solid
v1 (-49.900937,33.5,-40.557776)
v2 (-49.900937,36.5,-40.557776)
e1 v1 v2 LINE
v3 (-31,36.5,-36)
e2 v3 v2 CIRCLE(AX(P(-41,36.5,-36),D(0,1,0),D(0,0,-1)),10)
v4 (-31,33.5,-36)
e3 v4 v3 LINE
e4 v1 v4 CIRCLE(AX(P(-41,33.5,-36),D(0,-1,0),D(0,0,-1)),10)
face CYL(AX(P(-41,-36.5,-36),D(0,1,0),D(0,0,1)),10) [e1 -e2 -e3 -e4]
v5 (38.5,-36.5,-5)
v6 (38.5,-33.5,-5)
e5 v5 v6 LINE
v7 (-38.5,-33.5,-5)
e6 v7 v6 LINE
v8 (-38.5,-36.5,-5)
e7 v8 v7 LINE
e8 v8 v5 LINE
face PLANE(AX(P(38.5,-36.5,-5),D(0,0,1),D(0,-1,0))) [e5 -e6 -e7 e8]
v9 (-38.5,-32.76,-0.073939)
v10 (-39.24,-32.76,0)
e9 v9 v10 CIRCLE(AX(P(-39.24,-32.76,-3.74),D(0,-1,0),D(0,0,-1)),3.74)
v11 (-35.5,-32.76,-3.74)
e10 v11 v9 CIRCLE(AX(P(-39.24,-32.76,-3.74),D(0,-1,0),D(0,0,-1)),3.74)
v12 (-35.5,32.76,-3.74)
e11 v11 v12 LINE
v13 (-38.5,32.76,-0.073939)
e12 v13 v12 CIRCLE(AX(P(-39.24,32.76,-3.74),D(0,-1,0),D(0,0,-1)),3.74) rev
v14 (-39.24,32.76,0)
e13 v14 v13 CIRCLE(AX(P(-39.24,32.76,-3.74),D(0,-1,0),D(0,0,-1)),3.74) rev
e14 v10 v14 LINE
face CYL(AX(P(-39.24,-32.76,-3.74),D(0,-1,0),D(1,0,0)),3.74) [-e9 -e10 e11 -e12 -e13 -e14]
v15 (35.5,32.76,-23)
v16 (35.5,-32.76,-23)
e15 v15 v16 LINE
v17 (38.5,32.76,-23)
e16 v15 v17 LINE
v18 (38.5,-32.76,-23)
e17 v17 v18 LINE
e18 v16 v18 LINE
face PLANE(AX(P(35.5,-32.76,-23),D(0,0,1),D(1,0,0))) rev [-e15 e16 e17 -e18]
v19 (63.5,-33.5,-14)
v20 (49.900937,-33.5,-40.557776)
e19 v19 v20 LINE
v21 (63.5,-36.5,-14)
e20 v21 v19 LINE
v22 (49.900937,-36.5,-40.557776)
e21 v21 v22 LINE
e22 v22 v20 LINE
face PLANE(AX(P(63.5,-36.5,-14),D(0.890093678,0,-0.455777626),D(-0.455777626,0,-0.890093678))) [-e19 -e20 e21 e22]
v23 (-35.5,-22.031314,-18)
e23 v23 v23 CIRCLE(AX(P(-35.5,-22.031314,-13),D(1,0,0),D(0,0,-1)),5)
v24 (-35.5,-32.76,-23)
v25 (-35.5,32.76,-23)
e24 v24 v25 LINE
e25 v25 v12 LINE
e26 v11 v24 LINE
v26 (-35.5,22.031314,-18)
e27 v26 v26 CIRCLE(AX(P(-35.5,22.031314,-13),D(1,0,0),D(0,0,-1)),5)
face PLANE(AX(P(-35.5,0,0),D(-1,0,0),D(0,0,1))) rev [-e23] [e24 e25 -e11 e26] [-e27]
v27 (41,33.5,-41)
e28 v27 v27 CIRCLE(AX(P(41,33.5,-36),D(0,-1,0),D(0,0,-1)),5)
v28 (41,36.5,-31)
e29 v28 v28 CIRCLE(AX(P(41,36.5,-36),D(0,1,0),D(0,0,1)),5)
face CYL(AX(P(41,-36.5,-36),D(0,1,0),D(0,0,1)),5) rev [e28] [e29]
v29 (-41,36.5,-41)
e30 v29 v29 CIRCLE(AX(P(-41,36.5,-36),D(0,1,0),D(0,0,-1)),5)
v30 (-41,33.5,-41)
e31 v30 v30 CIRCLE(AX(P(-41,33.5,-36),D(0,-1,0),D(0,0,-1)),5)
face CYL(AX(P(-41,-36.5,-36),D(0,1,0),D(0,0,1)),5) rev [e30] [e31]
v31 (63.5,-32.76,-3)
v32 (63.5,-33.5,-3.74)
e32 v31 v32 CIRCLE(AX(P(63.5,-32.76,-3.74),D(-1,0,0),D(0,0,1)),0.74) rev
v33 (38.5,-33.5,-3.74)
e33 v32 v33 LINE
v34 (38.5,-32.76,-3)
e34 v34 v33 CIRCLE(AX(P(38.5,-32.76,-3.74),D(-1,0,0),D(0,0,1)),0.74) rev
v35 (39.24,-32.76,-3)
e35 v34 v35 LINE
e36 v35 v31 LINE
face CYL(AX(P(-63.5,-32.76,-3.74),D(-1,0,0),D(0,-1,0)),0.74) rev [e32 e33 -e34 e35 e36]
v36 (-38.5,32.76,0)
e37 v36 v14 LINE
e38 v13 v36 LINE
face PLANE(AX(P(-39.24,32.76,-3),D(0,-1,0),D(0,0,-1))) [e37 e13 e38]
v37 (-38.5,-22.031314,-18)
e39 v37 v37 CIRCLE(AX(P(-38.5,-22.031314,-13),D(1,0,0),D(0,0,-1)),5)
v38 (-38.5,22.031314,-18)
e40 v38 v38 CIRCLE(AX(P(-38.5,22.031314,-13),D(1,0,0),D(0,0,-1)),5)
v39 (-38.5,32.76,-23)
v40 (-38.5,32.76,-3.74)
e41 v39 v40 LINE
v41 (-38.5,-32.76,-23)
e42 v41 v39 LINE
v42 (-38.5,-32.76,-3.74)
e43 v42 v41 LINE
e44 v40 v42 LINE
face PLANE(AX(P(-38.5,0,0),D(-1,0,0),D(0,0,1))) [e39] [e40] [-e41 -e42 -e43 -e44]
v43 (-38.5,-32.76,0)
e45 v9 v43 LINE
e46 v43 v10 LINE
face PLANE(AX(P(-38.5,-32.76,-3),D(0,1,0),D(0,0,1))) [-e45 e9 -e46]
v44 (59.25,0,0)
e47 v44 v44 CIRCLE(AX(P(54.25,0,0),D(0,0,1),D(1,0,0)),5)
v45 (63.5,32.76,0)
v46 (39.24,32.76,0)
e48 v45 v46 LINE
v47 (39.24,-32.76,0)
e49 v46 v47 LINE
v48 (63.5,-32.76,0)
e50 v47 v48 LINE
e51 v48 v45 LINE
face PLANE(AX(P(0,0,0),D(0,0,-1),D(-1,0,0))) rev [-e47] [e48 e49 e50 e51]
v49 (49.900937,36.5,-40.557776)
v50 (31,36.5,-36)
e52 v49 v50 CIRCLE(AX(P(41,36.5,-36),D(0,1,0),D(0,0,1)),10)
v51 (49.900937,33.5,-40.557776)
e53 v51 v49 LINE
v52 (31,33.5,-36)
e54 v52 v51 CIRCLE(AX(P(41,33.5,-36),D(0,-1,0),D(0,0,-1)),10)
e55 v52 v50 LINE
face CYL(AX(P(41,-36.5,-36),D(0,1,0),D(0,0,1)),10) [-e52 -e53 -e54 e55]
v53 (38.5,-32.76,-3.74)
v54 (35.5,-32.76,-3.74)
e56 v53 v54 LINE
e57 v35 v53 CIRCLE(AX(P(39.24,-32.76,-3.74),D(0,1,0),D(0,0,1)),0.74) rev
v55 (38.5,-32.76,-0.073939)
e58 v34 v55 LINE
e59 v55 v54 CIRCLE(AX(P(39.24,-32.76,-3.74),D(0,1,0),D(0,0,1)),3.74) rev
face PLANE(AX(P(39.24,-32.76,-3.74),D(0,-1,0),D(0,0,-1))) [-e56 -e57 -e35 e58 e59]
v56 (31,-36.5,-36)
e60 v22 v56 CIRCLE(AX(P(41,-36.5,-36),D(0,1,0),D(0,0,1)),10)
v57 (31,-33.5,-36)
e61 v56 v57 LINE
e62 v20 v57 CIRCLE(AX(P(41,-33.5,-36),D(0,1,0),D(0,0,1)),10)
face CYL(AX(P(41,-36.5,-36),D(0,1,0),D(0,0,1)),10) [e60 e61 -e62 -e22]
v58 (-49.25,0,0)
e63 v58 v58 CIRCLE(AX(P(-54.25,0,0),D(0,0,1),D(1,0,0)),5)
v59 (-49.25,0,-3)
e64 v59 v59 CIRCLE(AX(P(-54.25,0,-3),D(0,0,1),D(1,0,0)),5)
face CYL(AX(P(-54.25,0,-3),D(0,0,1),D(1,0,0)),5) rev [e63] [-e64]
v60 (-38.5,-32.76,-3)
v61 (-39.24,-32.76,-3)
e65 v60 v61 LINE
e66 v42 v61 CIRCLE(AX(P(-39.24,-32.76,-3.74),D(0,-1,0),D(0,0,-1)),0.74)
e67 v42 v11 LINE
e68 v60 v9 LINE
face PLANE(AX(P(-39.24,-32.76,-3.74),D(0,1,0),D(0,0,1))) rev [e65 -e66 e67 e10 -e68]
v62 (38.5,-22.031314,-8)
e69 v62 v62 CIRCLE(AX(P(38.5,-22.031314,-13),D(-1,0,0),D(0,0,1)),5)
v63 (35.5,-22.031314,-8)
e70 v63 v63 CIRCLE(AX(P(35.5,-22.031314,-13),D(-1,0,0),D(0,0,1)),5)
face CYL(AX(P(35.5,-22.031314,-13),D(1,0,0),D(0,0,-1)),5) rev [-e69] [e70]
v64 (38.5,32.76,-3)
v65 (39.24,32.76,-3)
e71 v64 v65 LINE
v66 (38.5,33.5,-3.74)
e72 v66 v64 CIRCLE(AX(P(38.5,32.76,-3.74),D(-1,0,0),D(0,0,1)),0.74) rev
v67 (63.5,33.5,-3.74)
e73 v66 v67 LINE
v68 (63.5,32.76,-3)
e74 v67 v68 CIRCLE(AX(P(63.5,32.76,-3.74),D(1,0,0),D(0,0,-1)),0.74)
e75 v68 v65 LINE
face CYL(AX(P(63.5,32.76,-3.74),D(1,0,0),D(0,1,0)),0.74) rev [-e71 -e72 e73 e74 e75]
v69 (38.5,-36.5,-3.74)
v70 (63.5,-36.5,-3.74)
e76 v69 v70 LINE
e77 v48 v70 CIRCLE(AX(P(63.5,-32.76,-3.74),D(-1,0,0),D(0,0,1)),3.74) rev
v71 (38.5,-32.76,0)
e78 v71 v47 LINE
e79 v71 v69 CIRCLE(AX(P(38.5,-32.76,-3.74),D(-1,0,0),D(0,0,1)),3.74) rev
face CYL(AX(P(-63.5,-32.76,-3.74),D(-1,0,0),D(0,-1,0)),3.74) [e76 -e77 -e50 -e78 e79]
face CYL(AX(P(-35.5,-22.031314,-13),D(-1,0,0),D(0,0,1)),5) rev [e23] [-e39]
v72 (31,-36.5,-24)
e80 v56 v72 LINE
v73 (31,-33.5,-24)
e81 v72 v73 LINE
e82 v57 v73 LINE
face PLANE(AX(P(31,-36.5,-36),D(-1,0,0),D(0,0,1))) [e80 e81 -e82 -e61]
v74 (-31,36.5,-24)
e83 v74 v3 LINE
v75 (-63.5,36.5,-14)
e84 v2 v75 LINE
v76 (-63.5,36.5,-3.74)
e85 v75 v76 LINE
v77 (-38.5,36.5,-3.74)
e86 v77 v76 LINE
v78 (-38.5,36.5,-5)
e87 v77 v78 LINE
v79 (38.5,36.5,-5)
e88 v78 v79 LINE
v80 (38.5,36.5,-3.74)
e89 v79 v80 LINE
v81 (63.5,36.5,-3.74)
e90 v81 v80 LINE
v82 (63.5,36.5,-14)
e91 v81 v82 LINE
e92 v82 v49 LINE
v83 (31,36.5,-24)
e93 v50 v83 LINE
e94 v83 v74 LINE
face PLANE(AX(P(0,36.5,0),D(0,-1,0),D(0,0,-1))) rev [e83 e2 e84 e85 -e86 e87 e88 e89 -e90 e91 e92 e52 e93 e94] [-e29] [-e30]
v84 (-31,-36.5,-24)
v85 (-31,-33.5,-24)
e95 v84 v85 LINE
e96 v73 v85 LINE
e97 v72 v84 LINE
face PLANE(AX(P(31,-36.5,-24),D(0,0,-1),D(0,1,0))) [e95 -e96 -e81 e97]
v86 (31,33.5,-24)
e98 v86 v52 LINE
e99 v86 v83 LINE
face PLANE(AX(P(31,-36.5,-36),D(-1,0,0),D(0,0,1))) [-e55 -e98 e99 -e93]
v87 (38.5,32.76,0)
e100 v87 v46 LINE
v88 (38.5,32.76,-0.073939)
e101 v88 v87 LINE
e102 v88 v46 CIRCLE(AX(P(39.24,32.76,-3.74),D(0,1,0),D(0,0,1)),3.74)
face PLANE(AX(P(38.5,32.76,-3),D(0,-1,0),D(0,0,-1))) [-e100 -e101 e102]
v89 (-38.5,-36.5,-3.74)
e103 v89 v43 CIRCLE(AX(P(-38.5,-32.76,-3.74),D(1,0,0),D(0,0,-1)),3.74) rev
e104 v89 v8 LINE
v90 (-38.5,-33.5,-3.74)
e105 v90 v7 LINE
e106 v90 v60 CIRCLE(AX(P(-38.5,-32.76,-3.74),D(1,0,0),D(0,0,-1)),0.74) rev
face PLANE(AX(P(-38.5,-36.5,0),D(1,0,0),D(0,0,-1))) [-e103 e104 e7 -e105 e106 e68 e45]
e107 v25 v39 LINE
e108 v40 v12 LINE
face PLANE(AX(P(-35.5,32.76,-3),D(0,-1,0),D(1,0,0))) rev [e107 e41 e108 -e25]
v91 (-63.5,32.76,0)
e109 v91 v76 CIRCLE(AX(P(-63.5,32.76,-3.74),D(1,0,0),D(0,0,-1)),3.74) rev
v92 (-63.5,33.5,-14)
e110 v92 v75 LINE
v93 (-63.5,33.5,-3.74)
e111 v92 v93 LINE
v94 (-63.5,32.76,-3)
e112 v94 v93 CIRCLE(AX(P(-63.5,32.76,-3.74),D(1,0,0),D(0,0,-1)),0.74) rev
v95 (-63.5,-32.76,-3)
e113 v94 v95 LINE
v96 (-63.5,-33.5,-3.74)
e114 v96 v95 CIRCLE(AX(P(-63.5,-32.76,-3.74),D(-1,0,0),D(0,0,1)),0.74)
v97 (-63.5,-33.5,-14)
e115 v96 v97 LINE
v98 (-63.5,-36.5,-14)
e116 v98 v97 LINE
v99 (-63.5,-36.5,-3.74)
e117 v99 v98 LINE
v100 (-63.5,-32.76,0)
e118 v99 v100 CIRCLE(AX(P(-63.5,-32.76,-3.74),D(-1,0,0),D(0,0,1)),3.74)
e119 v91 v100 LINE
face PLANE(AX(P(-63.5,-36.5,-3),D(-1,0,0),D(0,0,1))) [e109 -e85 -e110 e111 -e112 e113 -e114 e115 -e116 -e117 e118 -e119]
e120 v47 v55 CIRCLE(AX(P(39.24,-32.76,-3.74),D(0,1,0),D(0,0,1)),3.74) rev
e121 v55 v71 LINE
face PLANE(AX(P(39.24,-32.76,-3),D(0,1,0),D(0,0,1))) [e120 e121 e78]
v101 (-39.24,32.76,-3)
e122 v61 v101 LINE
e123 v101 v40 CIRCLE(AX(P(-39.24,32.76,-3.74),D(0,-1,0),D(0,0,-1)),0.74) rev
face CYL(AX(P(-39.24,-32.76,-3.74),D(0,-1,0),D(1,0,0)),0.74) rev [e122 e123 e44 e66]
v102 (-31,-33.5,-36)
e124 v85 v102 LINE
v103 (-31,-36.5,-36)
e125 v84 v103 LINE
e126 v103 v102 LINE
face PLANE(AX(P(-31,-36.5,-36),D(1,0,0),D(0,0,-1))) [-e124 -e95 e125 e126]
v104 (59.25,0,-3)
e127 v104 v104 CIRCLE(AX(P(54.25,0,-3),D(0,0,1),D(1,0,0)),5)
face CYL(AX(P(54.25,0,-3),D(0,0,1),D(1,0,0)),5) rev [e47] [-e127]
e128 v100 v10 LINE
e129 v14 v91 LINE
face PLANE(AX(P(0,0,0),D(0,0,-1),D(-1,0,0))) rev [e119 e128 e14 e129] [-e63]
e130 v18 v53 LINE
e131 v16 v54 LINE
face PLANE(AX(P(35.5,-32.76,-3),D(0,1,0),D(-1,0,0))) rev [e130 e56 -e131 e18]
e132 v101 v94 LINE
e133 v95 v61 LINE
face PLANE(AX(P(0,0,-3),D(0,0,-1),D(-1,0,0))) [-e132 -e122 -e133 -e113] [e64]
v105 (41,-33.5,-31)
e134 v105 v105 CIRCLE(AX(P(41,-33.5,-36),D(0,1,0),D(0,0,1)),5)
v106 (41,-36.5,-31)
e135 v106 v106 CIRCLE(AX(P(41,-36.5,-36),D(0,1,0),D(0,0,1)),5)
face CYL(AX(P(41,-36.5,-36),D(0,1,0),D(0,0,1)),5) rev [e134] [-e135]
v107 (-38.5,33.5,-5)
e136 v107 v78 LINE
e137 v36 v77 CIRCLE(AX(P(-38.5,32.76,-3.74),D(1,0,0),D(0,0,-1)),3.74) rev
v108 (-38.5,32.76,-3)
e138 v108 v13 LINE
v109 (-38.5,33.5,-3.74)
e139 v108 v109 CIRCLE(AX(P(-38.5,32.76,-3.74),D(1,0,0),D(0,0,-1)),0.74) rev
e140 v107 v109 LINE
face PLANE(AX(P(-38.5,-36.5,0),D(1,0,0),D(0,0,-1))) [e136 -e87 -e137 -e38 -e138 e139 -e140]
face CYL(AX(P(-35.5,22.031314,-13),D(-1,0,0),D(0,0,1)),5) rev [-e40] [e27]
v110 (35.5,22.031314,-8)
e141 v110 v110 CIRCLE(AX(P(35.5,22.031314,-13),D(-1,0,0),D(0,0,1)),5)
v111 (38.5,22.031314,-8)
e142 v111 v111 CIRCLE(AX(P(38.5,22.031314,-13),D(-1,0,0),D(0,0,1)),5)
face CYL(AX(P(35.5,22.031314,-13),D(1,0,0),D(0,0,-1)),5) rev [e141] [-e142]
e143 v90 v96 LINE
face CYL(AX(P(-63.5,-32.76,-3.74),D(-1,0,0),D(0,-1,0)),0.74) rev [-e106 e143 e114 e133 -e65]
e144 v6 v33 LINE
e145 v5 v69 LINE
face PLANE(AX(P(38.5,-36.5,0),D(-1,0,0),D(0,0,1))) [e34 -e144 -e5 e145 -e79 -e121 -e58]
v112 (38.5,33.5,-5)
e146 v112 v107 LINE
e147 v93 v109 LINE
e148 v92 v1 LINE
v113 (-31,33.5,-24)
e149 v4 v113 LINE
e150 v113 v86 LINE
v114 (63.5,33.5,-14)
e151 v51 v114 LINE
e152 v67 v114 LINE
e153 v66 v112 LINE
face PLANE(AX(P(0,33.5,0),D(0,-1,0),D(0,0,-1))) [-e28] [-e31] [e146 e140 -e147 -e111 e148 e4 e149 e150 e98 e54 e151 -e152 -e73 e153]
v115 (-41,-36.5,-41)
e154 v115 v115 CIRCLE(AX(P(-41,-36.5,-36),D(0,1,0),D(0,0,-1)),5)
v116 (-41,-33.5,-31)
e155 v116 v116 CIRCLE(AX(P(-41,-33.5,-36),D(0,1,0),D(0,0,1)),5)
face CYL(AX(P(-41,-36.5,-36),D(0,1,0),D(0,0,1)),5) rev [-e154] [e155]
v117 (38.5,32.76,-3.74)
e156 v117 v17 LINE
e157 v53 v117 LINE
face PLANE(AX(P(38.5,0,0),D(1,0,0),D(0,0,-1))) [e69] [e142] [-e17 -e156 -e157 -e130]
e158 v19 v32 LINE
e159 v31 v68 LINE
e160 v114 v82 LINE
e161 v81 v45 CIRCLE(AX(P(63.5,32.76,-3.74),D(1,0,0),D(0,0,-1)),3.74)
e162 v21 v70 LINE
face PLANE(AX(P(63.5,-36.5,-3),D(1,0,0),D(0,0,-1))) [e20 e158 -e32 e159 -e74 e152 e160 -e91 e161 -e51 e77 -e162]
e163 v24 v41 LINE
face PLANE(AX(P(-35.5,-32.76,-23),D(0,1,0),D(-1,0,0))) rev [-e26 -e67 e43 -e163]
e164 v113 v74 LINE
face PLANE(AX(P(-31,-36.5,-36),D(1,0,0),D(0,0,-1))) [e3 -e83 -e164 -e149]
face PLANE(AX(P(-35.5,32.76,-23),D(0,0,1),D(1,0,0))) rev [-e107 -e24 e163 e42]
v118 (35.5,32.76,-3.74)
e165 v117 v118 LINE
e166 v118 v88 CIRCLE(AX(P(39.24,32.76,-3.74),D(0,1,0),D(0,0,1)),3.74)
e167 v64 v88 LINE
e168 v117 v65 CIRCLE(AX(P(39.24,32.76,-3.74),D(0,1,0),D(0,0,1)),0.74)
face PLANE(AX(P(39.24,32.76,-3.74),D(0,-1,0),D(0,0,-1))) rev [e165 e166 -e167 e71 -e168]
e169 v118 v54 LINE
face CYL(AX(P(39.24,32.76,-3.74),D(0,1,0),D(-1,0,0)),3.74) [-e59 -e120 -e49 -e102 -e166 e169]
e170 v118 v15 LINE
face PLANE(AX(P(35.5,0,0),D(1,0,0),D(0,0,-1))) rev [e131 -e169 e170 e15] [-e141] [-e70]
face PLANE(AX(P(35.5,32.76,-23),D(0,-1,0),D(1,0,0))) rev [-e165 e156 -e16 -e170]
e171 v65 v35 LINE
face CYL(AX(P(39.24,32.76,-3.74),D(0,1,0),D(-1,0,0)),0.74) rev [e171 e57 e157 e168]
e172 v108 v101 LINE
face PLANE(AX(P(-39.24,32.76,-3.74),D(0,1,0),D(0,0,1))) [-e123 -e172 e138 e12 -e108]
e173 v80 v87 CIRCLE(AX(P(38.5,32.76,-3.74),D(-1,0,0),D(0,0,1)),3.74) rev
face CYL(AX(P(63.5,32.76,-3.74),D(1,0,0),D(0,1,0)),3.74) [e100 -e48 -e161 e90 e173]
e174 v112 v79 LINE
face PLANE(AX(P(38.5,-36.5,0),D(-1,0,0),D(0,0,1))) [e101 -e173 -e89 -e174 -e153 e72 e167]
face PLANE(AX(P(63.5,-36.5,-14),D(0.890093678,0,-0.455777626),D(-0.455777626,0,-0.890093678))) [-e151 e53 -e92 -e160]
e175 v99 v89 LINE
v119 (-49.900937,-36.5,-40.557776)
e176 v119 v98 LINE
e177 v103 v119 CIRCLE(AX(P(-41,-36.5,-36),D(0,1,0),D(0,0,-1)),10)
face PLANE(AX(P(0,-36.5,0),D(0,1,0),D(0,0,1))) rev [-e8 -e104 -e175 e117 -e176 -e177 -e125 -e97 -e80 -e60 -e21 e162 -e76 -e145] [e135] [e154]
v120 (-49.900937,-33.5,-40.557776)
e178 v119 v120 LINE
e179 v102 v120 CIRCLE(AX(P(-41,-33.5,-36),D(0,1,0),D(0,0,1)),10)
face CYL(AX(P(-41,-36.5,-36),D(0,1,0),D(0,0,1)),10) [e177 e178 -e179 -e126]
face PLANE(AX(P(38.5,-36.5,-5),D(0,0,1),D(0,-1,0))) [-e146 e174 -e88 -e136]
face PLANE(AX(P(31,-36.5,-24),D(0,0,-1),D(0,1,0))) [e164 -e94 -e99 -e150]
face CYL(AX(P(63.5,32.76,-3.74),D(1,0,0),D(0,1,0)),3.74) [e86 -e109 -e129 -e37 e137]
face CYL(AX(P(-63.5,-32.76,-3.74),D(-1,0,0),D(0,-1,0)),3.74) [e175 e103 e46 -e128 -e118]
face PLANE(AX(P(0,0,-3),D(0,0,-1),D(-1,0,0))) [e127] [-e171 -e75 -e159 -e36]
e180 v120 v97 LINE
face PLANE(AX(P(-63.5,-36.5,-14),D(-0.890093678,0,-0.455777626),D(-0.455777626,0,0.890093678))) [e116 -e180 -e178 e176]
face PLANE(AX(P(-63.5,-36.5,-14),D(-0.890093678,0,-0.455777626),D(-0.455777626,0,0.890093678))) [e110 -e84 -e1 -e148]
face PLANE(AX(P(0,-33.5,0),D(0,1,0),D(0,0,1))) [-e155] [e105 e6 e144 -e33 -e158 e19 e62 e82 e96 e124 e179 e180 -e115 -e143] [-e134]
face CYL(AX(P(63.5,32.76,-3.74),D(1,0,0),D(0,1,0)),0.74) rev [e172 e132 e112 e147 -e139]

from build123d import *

# Parameters (mm, degrees)
SKETCH_1_W                         = 127
SKETCH_1_H                         = 73
SKETCH_1_R                         = 5
SM_BASE_FLANGE_1_DEPTH             = 3
SM_EDGE_FLANGE_1_STRIP_W           = 13.48
SM_EDGE_FLANGE_1_STRIP_H           = 3
SM_EDGE_FLANGE_1_STRIP_CUT_DEPTH   = 127
SM_EDGE_FLANGE_1_STRIP_2_W         = 13.48
SM_EDGE_FLANGE_1_STRIP_2_H         = 3
SM_EDGE_FLANGE_1_STRIP_CUT_2_DEPTH = 127
SM_EDGE_FLANGE_1_DEPTH             = 127
SM_EDGE_FLANGE_1_BEND_DEPTH        = 127
SKETCH_12_OUTSIDE_W                = 159.708
SKETCH_12_OUTSIDE_H                = 78.708
SKETCH_12_OUTSIDE_R                = 5
CUT_EXTRUDE_4_DEPTH                = 108.131928014
SM_EDGE_FLANGE_2_STRIP_W           = 13.48
SM_EDGE_FLANGE_2_STRIP_H           = 3
SM_EDGE_FLANGE_2_STRIP_CUT_DEPTH   = 65.52
SM_EDGE_FLANGE_2_STRIP_2_W         = 13.48
SM_EDGE_FLANGE_2_STRIP_2_H         = 3
SM_EDGE_FLANGE_2_STRIP_CUT_2_DEPTH = 65.52
SM_EDGE_FLANGE_2_DEPTH             = 65.52
SM_START                           = 3
SM_EDGE_FLANGE_2_PROFILE_W         = 65.52
SM_EDGE_FLANGE_2_PROFILE_H         = 19.26
SM_EDGE_FLANGE_2_PROFILE_R         = 5
SM_EDGE_FLANGE_2_FLAT_DEPTH        = 3
SM_EDGE_FLANGE_2_BEND_DEPTH        = 65.52
SM_EDGE_FLANGE_2_PROFILE_2_W       = 65.52
SM_EDGE_FLANGE_2_PROFILE_2_H       = 19.26
SM_EDGE_FLANGE_2_PROFILE_2_R       = 5
SM_EDGE_FLANGE_2_FLAT_2_DEPTH      = 3


# Sheet-metal steps are written as plain solids
with BuildPart() as part:
    # Sketch 1 → Базовая кромка1 (new body)
    with BuildSketch(Plane.XY):
        Rectangle(SKETCH_1_W, SKETCH_1_H)
        with Locations((-54.25, 0)):
            Circle(SKETCH_1_R, mode=Mode.SUBTRACT)
        with Locations((54.25, 0)):
            Circle(SKETCH_1_R, mode=Mode.SUBTRACT)
    extrude(amount=-SM_BASE_FLANGE_1_DEPTH)

    # Ребро-кромка1 strip (across the edge) → Ребро-кромка1 strip cut (cut)
    with BuildSketch(Plane(origin=(-63.5, 36.5, -3), x_dir=(0, -1, 0), z_dir=(1, 0, 0))):
        with Locations((-3, -1.5)):
            Rectangle(SM_EDGE_FLANGE_1_STRIP_W, SM_EDGE_FLANGE_1_STRIP_H)
    extrude(amount=SM_EDGE_FLANGE_1_STRIP_CUT_DEPTH, mode=Mode.SUBTRACT)

    # Ребро-кромка1 strip 2 (across the edge) → Ребро-кромка1 strip cut 2 (cut)
    with BuildSketch(Plane(origin=(63.5, -36.5, -3), x_dir=(0, 1, 0), z_dir=(-1, 0, 0))):
        with Locations((-3, -1.5)):
            Rectangle(SM_EDGE_FLANGE_1_STRIP_2_W, SM_EDGE_FLANGE_1_STRIP_2_H)
    extrude(amount=SM_EDGE_FLANGE_1_STRIP_CUT_2_DEPTH, mode=Mode.SUBTRACT)

    # Ребро-кромка1 section (across the edge) → Ребро-кромка1 (add)
    with BuildSketch(Plane(origin=(-63.5, 36.5, -3), x_dir=(0, -1, 0), z_dir=(1, 0, 0))):
        with BuildLine():
            Line((0, 0.74), (0, 43))
            Line((0, 43), (3, 43))
            Line((3, 43), (3, 0.74))
            ThreePointArc((3, 0.74), (3.216740982, 0.216740982), (3.74, 0))
            Line((3.74, 0), (3.74, -3))
            ThreePointArc((3.74, -3), (1.095420638, -1.904579362), (0, 0.74))
        make_face()
    extrude(amount=SM_EDGE_FLANGE_1_DEPTH)

    # Ребро-кромка1 section 2 (across the edge) → Ребро-кромка1 bend (add)
    with BuildSketch(Plane(origin=(63.5, -36.5, -3), x_dir=(0, 1, 0), z_dir=(-1, 0, 0))):
        with BuildLine():
            Line((0, 0.74), (0, 43))
            Line((0, 43), (3, 43))
            Line((3, 43), (3, 0.74))
            ThreePointArc((3, 0.74), (3.216740982, 0.216740982), (3.74, 0))
            Line((3.74, 0), (3.74, -3))
            ThreePointArc((3.74, -3), (1.095420638, -1.904579362), (0, 0.74))
        make_face()
    extrude(amount=SM_EDGE_FLANGE_1_BEND_DEPTH)

    # Эскиз12 outside → Вырез-Вытянуть4 (cut, through all)
    # profile 1 of 3: a face of its own
    with BuildSketch(Plane(origin=(0, 36.5, 0), x_dir=(1, 0, 0), z_dir=(0, 1, 0))):
        with Locations((0, 23)):
            Rectangle(SKETCH_12_OUTSIDE_W, SKETCH_12_OUTSIDE_H)
        with BuildLine():
            Line((63.5, 14), (49.900936783, 40.557776255))
            ThreePointArc((49.900936783, 40.557776255), (38.655790946, 45.721351959), (31, 36))
            Line((31, 36), (31, 24))
            Line((31, 24), (-31, 24))
            Line((-31, 24), (-31, 36))
            ThreePointArc((-31, 36), (-38.655790946, 45.721351959), (-49.900936783, 40.557776255))
            Line((-49.900936783, 40.557776255), (-63.5, 14))
            Line((-63.5, 14), (-63.5, 0))
            Line((-63.5, 0), (-38.5, 0))
            Line((-38.5, 0), (-38.5, 5))
            Line((-38.5, 5), (38.5, 5))
            Line((38.5, 5), (38.5, 0))
            Line((38.5, 0), (63.5, 0))
            Line((63.5, 0), (63.5, 14))
        make_face(mode=Mode.SUBTRACT)
    # profile 2 of 3: a face of its own
    with BuildSketch(Plane(origin=(0, 36.5, 0), x_dir=(1, 0, 0), z_dir=(0, 1, 0))):
        with Locations(Location((41, 36, 0), (0, 0, 270))):
            Circle(SKETCH_12_OUTSIDE_R)
    # profile 3 of 3: a face of its own
    with BuildSketch(Plane(origin=(0, 36.5, 0), x_dir=(1, 0, 0), z_dir=(0, 1, 0))):
        with Locations(Location((-41, 36, 0), (0, 0, 270))):
            Circle(SKETCH_12_OUTSIDE_R)
    extrude(amount=-CUT_EXTRUDE_4_DEPTH, mode=Mode.SUBTRACT)

    # Ребро-кромка2 strip (across the edge) → Ребро-кромка2 strip cut (cut)
    with BuildSketch(Plane(origin=(38.5, -32.76, -3), x_dir=(1, 0, 0), z_dir=(0, 1, 0))):
        with Locations((-6, -1.5)):
            Rectangle(SM_EDGE_FLANGE_2_STRIP_W, SM_EDGE_FLANGE_2_STRIP_H)
    extrude(amount=SM_EDGE_FLANGE_2_STRIP_CUT_DEPTH, mode=Mode.SUBTRACT)

    # Ребро-кромка2 strip 2 (across the edge) → Ребро-кромка2 strip cut 2 (cut)
    with BuildSketch(Plane(origin=(-38.5, 32.76, -3), x_dir=(-1, 0, 0), z_dir=(0, -1, 0))):
        with Locations((-6, -1.5)):
            Rectangle(SM_EDGE_FLANGE_2_STRIP_2_W, SM_EDGE_FLANGE_2_STRIP_2_H)
    extrude(amount=SM_EDGE_FLANGE_2_STRIP_CUT_2_DEPTH, mode=Mode.SUBTRACT)

    # Ребро-кромка2 bend section (across the edge) → Ребро-кромка2 (add)
    with BuildSketch(Plane(origin=(38.5, -32.76, -3), x_dir=(1, 0, 0), z_dir=(0, 1, 0))):
        with BuildLine():
            Line((-3, 0.74), (0, 0.74))
            ThreePointArc((0, 0.74), (0.216740982, 0.216740982), (0.74, 0))
            Line((0.74, 0), (0.74, -3))
            ThreePointArc((0.74, -3), (-1.904579362, -1.904579362), (-3, 0.74))
        make_face()
    extrude(amount=SM_EDGE_FLANGE_2_DEPTH)

    # Ребро-кромка2 profile (on flange) → Ребро-кромка2 flat (add)
    with BuildSketch(Plane(origin=(38.5, 0, -3), x_dir=(0, 1, 0), z_dir=(-1, 0, 0)).offset(SM_START)):
        with Locations((0, 10.37)):
            Rectangle(SM_EDGE_FLANGE_2_PROFILE_W, SM_EDGE_FLANGE_2_PROFILE_H)
        with Locations((22.031313941, 10)):
            Circle(SM_EDGE_FLANGE_2_PROFILE_R, mode=Mode.SUBTRACT)
        with Locations((-22.031313941, 10)):
            Circle(SM_EDGE_FLANGE_2_PROFILE_R, mode=Mode.SUBTRACT)
    extrude(amount=-SM_EDGE_FLANGE_2_FLAT_DEPTH)

    # Ребро-кромка2 bend section 2 (across the edge) → Ребро-кромка2 bend (add)
    with BuildSketch(Plane(origin=(-38.5, 32.76, -3), x_dir=(-1, 0, 0), z_dir=(0, -1, 0))):
        with BuildLine():
            Line((-3, 0.74), (0, 0.74))
            ThreePointArc((0, 0.74), (0.216740982, 0.216740982), (0.74, 0))
            Line((0.74, 0), (0.74, -3))
            ThreePointArc((0.74, -3), (-1.904579362, -1.904579362), (-3, 0.74))
        make_face()
    extrude(amount=SM_EDGE_FLANGE_2_BEND_DEPTH)

    # Ребро-кромка2 profile 2 (on flange) → Ребро-кромка2 flat 2 (add)
    with BuildSketch(Plane(origin=(-38.5, 0, -3), x_dir=(0, -1, 0), z_dir=(1, 0, 0)).offset(SM_START)):
        with Locations((0, 10.37)):
            Rectangle(SM_EDGE_FLANGE_2_PROFILE_2_W, SM_EDGE_FLANGE_2_PROFILE_2_H)
        with Locations((-22.031313941, 10)):
            Circle(SM_EDGE_FLANGE_2_PROFILE_2_R, mode=Mode.SUBTRACT)
        with Locations((22.031313941, 10)):
            Circle(SM_EDGE_FLANGE_2_PROFILE_2_R, mode=Mode.SUBTRACT)
    extrude(amount=-SM_EDGE_FLANGE_2_FLAT_2_DEPTH)


solid = part.part
